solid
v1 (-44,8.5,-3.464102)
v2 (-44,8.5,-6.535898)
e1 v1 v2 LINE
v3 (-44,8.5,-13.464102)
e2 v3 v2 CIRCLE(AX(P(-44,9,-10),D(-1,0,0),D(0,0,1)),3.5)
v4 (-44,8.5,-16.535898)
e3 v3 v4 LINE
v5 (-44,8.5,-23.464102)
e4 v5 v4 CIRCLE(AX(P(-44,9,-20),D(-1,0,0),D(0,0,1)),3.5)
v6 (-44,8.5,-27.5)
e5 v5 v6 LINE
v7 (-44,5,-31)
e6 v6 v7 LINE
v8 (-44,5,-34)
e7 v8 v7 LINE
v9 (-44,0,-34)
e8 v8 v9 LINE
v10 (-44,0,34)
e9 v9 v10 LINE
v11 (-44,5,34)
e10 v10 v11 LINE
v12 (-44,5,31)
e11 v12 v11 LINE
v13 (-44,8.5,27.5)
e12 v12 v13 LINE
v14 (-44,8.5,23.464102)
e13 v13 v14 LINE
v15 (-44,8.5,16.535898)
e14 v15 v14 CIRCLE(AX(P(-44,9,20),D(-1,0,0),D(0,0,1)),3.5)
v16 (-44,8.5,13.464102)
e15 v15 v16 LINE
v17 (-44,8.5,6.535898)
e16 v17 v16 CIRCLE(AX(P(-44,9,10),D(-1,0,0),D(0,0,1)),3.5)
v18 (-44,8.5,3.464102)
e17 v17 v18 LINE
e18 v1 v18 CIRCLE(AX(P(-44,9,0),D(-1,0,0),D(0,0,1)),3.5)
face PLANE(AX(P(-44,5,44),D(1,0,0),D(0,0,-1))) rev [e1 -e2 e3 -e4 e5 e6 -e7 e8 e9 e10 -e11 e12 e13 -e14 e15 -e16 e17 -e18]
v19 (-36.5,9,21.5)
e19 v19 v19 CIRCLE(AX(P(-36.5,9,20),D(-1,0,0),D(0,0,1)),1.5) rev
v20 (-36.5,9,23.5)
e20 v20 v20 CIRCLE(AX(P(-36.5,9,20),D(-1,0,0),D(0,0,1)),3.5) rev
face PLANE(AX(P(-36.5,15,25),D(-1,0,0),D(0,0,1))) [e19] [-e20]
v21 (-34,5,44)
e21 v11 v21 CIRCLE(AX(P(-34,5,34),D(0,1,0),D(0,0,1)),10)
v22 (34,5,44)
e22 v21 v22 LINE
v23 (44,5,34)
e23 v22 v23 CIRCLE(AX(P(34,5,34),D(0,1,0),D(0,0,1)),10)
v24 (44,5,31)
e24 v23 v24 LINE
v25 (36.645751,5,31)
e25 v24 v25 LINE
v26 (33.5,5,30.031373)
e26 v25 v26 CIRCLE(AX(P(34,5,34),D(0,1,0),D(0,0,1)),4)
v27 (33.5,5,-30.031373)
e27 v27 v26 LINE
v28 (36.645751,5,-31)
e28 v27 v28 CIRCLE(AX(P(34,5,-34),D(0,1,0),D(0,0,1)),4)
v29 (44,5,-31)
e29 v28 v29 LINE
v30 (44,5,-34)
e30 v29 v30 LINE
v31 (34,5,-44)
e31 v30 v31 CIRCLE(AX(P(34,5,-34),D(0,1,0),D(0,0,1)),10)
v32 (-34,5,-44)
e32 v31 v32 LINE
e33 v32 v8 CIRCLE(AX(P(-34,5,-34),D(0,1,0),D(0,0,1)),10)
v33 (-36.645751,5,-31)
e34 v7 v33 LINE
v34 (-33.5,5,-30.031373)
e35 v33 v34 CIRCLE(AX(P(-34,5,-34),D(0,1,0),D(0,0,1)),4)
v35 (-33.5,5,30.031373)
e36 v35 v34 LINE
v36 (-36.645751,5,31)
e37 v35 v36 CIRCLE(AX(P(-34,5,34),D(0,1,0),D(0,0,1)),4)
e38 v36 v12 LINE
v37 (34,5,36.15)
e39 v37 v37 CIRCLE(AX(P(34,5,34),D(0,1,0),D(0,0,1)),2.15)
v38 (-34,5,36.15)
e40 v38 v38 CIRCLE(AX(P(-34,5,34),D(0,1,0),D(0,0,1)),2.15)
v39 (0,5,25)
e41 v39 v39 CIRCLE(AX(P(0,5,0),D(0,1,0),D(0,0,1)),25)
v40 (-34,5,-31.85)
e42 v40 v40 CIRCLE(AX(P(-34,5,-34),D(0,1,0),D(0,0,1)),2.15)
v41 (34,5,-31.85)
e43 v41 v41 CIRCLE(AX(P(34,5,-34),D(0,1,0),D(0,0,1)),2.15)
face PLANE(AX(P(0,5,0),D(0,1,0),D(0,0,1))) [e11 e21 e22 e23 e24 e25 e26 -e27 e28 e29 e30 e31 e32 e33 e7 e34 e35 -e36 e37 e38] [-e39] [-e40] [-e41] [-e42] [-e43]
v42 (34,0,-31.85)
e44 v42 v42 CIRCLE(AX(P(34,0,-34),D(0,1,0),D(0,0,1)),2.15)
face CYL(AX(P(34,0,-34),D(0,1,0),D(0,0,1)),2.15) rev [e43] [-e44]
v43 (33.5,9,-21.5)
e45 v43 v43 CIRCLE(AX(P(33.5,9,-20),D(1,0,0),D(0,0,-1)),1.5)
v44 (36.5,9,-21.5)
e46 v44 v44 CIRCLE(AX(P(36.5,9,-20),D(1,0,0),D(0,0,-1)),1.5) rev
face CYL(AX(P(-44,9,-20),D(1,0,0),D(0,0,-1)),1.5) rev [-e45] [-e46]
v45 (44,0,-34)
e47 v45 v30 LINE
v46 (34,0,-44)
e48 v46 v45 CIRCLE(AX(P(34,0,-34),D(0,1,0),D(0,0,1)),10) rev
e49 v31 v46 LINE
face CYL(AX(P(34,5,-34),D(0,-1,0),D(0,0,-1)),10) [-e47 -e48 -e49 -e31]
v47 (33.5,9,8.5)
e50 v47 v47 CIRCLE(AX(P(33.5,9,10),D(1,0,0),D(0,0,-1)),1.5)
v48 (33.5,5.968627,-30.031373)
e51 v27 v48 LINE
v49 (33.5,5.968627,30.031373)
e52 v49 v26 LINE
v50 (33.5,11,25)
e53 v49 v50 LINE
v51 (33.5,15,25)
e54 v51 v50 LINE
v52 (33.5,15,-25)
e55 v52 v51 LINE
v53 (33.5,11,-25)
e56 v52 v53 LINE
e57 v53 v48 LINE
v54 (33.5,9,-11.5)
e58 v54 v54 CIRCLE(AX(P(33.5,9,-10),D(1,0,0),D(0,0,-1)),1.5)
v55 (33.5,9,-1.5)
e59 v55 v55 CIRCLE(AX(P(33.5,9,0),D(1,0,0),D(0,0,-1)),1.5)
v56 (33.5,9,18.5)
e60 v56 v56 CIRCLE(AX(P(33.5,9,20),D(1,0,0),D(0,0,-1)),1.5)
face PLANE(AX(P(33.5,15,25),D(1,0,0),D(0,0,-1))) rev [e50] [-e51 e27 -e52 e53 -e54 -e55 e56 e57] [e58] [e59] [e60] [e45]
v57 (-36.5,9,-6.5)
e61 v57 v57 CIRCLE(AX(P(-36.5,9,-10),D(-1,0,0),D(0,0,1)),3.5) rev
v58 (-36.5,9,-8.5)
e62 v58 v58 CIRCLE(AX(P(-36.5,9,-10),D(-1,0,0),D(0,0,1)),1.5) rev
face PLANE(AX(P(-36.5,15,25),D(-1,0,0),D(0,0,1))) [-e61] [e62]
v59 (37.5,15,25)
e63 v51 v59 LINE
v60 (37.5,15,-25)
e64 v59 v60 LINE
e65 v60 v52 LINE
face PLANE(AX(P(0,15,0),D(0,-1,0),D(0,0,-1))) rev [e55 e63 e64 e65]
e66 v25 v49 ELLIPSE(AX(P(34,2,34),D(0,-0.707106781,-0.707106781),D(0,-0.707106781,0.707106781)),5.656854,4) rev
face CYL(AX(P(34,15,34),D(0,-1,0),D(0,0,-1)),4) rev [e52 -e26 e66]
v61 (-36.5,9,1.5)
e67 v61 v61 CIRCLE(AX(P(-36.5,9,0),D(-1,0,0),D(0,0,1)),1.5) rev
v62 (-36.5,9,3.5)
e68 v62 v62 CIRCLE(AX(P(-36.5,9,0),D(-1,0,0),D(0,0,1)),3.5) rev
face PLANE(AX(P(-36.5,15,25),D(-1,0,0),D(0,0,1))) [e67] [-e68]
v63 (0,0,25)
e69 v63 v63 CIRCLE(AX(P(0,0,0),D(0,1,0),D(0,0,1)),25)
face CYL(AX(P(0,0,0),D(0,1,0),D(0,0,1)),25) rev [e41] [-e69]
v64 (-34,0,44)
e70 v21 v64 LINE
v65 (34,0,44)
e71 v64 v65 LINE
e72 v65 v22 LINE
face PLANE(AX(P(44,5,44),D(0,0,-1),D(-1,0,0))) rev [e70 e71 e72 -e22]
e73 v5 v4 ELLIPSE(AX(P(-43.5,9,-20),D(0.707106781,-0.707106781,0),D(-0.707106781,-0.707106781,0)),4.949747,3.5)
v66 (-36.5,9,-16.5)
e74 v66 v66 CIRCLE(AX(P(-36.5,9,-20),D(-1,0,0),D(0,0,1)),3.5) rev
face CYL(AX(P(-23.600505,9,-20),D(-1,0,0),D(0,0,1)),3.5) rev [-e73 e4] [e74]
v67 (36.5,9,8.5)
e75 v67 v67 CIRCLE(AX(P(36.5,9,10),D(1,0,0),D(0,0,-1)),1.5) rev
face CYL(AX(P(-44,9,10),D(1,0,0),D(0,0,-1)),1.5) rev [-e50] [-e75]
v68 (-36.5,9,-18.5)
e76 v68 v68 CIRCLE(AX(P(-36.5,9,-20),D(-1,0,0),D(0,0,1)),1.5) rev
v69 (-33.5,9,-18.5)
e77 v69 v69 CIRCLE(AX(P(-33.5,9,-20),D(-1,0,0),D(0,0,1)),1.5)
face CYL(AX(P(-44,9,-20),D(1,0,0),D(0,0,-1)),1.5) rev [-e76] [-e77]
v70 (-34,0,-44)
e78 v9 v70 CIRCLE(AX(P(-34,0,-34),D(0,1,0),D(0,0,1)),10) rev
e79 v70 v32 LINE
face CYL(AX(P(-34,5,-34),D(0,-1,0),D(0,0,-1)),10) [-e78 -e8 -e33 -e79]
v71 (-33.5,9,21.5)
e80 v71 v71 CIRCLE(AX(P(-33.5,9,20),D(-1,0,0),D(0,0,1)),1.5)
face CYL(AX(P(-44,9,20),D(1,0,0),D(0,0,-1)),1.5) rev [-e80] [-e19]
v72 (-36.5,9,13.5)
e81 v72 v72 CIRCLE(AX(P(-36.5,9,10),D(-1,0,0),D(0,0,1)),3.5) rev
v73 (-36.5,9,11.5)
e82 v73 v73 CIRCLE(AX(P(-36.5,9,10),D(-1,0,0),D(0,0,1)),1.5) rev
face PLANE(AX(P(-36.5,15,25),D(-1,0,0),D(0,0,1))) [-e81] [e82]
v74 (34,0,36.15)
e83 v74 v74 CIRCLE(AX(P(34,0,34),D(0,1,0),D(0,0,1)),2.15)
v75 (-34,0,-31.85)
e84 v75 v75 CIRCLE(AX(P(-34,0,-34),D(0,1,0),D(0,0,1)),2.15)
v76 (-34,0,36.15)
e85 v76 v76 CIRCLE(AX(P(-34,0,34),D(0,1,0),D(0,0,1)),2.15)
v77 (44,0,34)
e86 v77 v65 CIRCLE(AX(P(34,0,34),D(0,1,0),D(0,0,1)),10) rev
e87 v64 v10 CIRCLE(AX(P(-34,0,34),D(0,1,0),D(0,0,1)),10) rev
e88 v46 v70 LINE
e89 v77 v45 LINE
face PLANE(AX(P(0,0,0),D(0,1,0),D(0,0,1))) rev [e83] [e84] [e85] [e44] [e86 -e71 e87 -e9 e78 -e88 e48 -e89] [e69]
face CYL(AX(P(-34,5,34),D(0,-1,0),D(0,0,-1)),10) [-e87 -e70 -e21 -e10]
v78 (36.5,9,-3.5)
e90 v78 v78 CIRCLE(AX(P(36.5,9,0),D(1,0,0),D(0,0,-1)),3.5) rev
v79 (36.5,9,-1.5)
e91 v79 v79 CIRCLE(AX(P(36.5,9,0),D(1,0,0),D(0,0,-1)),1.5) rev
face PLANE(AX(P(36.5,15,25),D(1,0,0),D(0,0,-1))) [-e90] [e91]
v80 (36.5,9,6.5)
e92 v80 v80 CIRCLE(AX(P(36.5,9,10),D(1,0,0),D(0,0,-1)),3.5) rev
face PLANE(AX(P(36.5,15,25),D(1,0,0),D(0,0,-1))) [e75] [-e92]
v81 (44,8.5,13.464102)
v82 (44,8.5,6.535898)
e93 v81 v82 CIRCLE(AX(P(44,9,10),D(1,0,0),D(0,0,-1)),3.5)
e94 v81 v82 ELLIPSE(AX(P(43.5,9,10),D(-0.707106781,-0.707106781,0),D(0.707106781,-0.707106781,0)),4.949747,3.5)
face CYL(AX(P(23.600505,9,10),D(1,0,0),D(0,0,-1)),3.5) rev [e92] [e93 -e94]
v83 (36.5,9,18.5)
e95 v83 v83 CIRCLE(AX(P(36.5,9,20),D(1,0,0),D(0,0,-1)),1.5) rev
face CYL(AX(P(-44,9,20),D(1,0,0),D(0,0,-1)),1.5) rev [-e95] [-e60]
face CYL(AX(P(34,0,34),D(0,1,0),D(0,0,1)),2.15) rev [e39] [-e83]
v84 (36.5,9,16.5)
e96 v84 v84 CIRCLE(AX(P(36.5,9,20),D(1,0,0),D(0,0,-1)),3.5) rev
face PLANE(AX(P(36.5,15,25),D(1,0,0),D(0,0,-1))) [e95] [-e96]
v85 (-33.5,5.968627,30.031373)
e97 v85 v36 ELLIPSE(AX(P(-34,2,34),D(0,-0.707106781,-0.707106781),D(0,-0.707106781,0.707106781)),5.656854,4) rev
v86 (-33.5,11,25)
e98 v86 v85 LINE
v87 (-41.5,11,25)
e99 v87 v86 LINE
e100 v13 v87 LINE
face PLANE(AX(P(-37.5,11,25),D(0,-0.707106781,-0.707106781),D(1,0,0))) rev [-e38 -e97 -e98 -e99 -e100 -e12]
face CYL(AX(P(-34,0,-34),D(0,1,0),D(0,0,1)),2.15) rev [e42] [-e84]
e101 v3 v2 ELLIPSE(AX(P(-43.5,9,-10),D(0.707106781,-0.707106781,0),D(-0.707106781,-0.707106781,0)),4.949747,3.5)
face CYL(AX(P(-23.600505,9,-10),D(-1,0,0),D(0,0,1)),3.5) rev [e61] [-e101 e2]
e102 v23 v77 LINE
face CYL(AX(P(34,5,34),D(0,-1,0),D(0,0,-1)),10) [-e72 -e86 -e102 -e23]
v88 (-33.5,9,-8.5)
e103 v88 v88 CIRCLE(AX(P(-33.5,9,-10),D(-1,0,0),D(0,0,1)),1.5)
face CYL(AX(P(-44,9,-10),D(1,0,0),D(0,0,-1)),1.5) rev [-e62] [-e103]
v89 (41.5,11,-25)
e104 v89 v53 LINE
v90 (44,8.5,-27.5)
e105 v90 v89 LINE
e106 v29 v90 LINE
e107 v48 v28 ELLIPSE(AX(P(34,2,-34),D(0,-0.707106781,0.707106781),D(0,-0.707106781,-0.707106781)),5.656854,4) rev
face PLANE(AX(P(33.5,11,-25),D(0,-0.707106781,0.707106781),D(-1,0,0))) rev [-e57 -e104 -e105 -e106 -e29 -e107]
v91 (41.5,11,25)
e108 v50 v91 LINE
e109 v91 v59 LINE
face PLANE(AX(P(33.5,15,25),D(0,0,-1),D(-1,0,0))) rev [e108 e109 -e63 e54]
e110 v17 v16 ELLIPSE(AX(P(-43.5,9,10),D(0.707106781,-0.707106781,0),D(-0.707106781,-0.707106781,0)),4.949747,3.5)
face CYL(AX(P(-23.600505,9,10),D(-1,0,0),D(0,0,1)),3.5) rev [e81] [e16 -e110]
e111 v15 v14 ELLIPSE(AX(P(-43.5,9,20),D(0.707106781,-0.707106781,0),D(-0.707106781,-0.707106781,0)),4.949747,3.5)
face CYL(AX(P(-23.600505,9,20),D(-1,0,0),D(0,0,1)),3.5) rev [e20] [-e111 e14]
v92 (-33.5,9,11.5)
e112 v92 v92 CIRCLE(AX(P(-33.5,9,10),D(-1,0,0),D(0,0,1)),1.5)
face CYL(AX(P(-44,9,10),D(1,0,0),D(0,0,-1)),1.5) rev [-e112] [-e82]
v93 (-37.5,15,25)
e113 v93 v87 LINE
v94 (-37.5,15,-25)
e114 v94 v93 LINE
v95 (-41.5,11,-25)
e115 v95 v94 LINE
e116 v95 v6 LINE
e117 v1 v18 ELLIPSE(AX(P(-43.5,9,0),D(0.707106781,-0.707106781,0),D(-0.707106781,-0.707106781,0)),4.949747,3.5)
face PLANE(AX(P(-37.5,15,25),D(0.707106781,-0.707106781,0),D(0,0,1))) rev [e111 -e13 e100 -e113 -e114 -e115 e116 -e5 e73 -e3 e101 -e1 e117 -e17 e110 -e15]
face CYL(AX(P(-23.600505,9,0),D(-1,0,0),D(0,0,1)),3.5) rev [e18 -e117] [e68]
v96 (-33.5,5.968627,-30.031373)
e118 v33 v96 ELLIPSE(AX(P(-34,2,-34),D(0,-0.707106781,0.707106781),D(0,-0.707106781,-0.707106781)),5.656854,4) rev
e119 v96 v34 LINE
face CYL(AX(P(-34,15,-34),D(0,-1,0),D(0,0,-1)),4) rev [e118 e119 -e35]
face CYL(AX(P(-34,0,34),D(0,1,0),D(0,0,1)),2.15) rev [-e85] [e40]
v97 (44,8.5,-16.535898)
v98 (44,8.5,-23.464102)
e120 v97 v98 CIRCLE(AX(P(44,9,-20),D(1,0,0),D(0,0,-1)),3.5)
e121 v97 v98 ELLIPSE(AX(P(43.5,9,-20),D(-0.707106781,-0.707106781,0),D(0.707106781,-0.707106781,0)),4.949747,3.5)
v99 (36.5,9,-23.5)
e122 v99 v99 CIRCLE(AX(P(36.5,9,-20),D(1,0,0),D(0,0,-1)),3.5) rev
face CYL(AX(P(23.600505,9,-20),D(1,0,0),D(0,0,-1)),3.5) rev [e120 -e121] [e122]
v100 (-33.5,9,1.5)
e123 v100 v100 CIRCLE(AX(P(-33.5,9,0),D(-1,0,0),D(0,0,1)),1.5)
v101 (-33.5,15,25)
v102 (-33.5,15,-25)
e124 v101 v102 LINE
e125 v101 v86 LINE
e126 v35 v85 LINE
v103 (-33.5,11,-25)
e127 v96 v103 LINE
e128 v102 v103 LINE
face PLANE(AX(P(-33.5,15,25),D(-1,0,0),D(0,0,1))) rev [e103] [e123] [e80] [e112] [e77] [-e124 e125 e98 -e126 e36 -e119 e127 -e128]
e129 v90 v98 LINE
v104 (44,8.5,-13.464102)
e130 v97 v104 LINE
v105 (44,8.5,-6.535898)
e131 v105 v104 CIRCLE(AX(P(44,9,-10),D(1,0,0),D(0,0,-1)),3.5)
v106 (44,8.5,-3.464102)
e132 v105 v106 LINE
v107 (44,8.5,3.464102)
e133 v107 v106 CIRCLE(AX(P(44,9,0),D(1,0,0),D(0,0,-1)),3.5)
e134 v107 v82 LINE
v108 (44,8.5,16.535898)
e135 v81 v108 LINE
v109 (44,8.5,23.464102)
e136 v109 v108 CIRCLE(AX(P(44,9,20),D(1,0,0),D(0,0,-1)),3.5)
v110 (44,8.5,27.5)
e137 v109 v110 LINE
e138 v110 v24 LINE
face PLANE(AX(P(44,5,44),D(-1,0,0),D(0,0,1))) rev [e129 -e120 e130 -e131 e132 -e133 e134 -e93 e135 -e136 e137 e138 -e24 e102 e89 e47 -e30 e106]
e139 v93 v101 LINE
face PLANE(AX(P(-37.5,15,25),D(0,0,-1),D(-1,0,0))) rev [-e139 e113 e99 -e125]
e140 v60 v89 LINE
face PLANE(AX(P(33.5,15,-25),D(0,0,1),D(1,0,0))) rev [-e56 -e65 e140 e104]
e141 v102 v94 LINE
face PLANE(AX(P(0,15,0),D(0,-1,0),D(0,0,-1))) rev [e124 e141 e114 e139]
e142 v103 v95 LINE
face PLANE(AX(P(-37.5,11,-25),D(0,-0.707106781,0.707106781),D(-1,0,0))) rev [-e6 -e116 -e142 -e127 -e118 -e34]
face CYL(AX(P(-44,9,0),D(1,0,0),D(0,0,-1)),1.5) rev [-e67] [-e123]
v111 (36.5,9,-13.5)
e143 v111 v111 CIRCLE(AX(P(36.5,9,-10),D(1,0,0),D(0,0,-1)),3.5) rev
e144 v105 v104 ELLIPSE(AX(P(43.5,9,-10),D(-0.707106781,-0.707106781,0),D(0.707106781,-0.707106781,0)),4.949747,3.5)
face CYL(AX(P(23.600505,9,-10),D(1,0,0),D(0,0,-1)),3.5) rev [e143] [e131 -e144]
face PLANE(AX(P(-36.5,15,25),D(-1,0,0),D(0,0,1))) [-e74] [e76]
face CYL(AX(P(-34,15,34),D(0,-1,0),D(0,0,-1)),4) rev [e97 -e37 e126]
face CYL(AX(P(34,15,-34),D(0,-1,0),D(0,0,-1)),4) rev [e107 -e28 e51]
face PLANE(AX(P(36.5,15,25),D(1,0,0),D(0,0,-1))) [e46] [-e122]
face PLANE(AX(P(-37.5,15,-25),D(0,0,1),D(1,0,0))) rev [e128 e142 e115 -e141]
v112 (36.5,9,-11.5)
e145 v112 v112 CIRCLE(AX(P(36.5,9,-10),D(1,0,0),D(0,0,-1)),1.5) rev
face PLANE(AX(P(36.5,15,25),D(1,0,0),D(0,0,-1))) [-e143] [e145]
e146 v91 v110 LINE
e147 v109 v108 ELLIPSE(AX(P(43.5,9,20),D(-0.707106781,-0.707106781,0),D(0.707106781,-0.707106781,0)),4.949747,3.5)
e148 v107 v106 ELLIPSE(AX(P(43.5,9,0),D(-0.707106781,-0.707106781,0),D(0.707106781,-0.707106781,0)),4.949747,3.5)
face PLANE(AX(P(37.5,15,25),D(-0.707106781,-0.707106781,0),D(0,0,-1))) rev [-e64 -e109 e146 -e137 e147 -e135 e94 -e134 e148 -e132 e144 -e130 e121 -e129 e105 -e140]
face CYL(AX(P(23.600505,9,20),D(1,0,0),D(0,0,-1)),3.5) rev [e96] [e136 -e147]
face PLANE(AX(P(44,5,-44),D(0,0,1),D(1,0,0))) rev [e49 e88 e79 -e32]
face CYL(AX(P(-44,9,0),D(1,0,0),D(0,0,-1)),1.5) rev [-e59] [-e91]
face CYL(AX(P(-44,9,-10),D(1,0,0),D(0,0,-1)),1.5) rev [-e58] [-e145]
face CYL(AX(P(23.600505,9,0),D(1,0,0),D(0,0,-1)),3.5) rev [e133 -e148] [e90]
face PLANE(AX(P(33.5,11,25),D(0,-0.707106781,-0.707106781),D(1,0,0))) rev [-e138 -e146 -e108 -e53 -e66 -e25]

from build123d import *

# Parameters (mm, degrees)
SKETCH1_W           = 88
SKETCH1_H           = 88
BOSS_EXTRUDE1_DEPTH = 5
FILLET1_R           = 10
SKETCH2_R           = 2.15
CUT_EXTRUDE1_DEPTH  = 63.42595614
SKETCH3_W           = 4
SKETCH3_H           = 50
BOSS_EXTRUDE2_DEPTH = 10
CHAMFER1_SIZE       = 10
SKETCH4_R           = 1.5
CUT_EXTRUDE2_DEPTH  = 65.007812023
SKETCH5_R           = 3.5
CUT_EXTRUDE3_DEPTH  = 7.5
CUT_EXTRUDE4_START  = -7.5
SKETCH6_R           = 3.5
CUT_EXTRUDE4_DEPTH  = 7.5
LPATTERN2_COUNT     = 5
LPATTERN2_PITCH     = 10
CHAMFER2_SIZE       = 6
SKETCH7_R           = 25
CUT_EXTRUDE5_DEPTH  = 64.023805026
SKETCH8_R           = 4
CUT_EXTRUDE6_DEPTH  = 64.023805026


with BuildPart() as part:
    # Sketch1 → Boss-Extrude1 (new body)
    with BuildSketch(Plane(origin=(0, 0, 0), x_dir=(1, 0, 0), z_dir=(0, 1, 0))):
        Rectangle(SKETCH1_W, SKETCH1_H)
    extrude(amount=BOSS_EXTRUDE1_DEPTH)

    # Fillet1
    fillet1_edges = [part.edges().sort_by_distance(p)[0] for p in [
        (-44, 2.5, -44),
        (44, 2.5, -44),
        (44, 2.5, 44),
        (-44, 2.5, 44),
    ]]
    fillet(fillet1_edges, radius=FILLET1_R)

    # Sketch2 → Cut-Extrude1 (cut, through all)
    with BuildSketch(Plane(origin=(0, 5, 0), x_dir=(1, 0, 0), z_dir=(0, 1, 0))):
        with Locations(Location((34, 34, 0), (0, 0, 270))):
            Circle(SKETCH2_R)
        with Locations(Location((34, -34, 0), (0, 0, 270))):
            Circle(SKETCH2_R)
        with Locations(Location((-34, -34, 0), (0, 0, 270))):
            Circle(SKETCH2_R)
        with Locations(Location((-34, 34, 0), (0, 0, 270))):
            Circle(SKETCH2_R)
    extrude(amount=-CUT_EXTRUDE1_DEPTH, mode=Mode.SUBTRACT)

    # Sketch3 → Boss-Extrude2 (add)
    with BuildSketch(Plane(origin=(0, 5, 0), x_dir=(1, 0, 0), z_dir=(0, 1, 0))):
        with Locations((-35.5, 0)):
            Rectangle(SKETCH3_W, SKETCH3_H)
        with Locations((35.5, 0)):
            Rectangle(SKETCH3_W, SKETCH3_H)
    extrude(amount=BOSS_EXTRUDE2_DEPTH)

    # Chamfer1
    # the kernel refuses this chamfer: 10 mm, written as the material it adds along each edge
    with BuildSketch(Plane(origin=(37.5, 5, 25), x_dir=(0.9996219169112968, -0.027495876610586403, 0), z_dir=(0, 0, -1))) as chamfer1_piece_1_section:
        Polygon((CHAMFER1_SIZE * 0.999621916911, -CHAMFER1_SIZE * 0.0274958766106), (-CHAMFER1_SIZE * 0.0274958766106, -CHAMFER1_SIZE * 0.999621916911), (0, 0), align=None)
    chamfer1_piece_1 = extrude(amount=50, mode=Mode.PRIVATE)
    chamfer1_piece_1 = split(chamfer1_piece_1, bisect_by=Plane(origin=(44, 8.634022107, 0), z_dir=(-1, 0, 0)), keep=Keep.TOP, mode=Mode.PRIVATE)
    add(chamfer1_piece_1)
    with BuildSketch(Plane(origin=(-37.5, 5, -25), x_dir=(-0.9996219169112968, -0.027495876610586403, 0), z_dir=(0, 0, 1))) as chamfer1_piece_2_section:
        Polygon((CHAMFER1_SIZE * 0.999621916911, -CHAMFER1_SIZE * 0.0274958766106), (-CHAMFER1_SIZE * 0.0274958766106, -CHAMFER1_SIZE * 0.999621916911), (0, 0), align=None)
    chamfer1_piece_2 = extrude(amount=50, mode=Mode.PRIVATE)
    chamfer1_piece_2 = split(chamfer1_piece_2, bisect_by=Plane(origin=(-44, 8.634022107, 0), z_dir=(1, 0, 0)), keep=Keep.TOP, mode=Mode.PRIVATE)
    add(chamfer1_piece_2)

    # Sketch4 → Cut-Extrude2 (cut, symmetric)
    with BuildSketch(Plane(origin=(0, 0, 0), x_dir=(0, 0, -1), z_dir=(1, 0, 0))):
        with Locations(Location((-20, 9, 0), (0, 0, 340.528779366))):
            Circle(SKETCH4_R)
    cut_extrude2 = extrude(amount=CUT_EXTRUDE2_DEPTH, both=True, mode=Mode.SUBTRACT)

    # Sketch5 → Cut-Extrude3 (cut)
    with BuildSketch(Plane(origin=(44, 0, 0), x_dir=(0, 0, -1), z_dir=(1, 0, 0))):
        with Locations((-20, 9)):
            Circle(SKETCH5_R)
    cut_extrude3 = extrude(amount=-CUT_EXTRUDE3_DEPTH, mode=Mode.SUBTRACT)

    # Sketch6 → Cut-Extrude4 (cut)
    with BuildSketch(Plane.ZY.offset(44).offset(CUT_EXTRUDE4_START)):
        with Locations(Location((20, 9, 0), (0, 0, 180))):
            Circle(SKETCH6_R)
    cut_extrude4 = extrude(amount=CUT_EXTRUDE4_DEPTH, mode=Mode.SUBTRACT)

    # LPattern2: Cut-Extrude2, Cut-Extrude3, Cut-Extrude4 ×5
    with Locations(*[(0, 0, -i * LPATTERN2_PITCH) for i in range(1, LPATTERN2_COUNT)]):
        add(cut_extrude2, mode=Mode.SUBTRACT)
        add(cut_extrude3, mode=Mode.SUBTRACT)
        add(cut_extrude4, mode=Mode.SUBTRACT)

    # Chamfer2
    # the kernel refuses this chamfer: 6 mm, written as the material it adds along each edge
    with BuildSketch(Plane(origin=(-44, 5, 25), x_dir=(-2.4740283856501726e-13, 0.9996219169112965, -0.027495876610592693), z_dir=(1, 0, 0))) as chamfer2_piece_1_section:
        Polygon((CHAMFER2_SIZE * 0.999621916911, CHAMFER2_SIZE * 0.0274958766106), (-CHAMFER2_SIZE * 0.0274958766102, CHAMFER2_SIZE * 0.999621916911), (0, 0), align=None)
    chamfer2_piece_1 = extrude(amount=10.5, mode=Mode.PRIVATE)
    chamfer2_piece_1 = split(chamfer2_piece_1, bisect_by=Plane(origin=(-42.122041118, 10.377958882, 27.00389647), z_dir=(0.7071067811868302, -0.7071067811862648, 0)), keep=Keep.TOP, mode=Mode.PRIVATE)
    add(chamfer2_piece_1)
    with BuildSketch(Plane(origin=(-33.5, 5, -25), x_dir=(-2.474214452272925e-13, 0.9996219169112968, 0.027495876610585616), z_dir=(-1, 0, 0))) as chamfer2_piece_2_section:
        Polygon((CHAMFER2_SIZE * 0.999621916911, CHAMFER2_SIZE * 0.0274958766106), (-CHAMFER2_SIZE * 0.0274958766106, CHAMFER2_SIZE * 0.999621916911), (0, 0), align=None)
    chamfer2_piece_2 = extrude(amount=10.5, mode=Mode.PRIVATE)
    chamfer2_piece_2 = split(chamfer2_piece_2, bisect_by=Plane(origin=(-42.122041118, 10.377958882, -27.00389647), z_dir=(0.7071067811868302, -0.7071067811862648, 0)), keep=Keep.TOP, mode=Mode.PRIVATE)
    add(chamfer2_piece_2)
    with BuildSketch(Plane(origin=(44, 5, -25), x_dir=(5.708966314845366e-15, -0.027495876610159536, -0.9996219169113084), z_dir=(-1, 0, 0))) as chamfer2_piece_3_section:
        Polygon((CHAMFER2_SIZE * 0.999621916911, -CHAMFER2_SIZE * 0.0274958766106), (-CHAMFER2_SIZE * 0.0274958766102, -CHAMFER2_SIZE * 0.999621916911), (0, 0), align=None)
    chamfer2_piece_3 = extrude(amount=10.5, mode=Mode.PRIVATE)
    chamfer2_piece_3 = split(chamfer2_piece_3, bisect_by=Plane(origin=(42.122041118, 10.377958882, -27.00389647), z_dir=(-0.7071067811868302, -0.7071067811862648, 0)), keep=Keep.TOP, mode=Mode.PRIVATE)
    add(chamfer2_piece_3)
    with BuildSketch(Plane(origin=(33.5, 5, 25), x_dir=(-1.864328825330305e-14, -0.02749587661058664, 0.9996219169112968), z_dir=(1, 0, 0))) as chamfer2_piece_4_section:
        Polygon((CHAMFER2_SIZE * 0.999621916911, -CHAMFER2_SIZE * 0.0274958766106), (-CHAMFER2_SIZE * 0.0274958766106, -CHAMFER2_SIZE * 0.999621916911), (0, 0), align=None)
    chamfer2_piece_4 = extrude(amount=10.5, mode=Mode.PRIVATE)
    chamfer2_piece_4 = split(chamfer2_piece_4, bisect_by=Plane(origin=(42.122041118, 10.377958882, 27.00389647), z_dir=(-0.7071067811868302, -0.7071067811862648, 0)), keep=Keep.TOP, mode=Mode.PRIVATE)
    add(chamfer2_piece_4)

    # Sketch7 → Cut-Extrude5 (cut, through all)
    with BuildSketch(Plane(origin=(0, 5, 0), x_dir=(1, 0, 0), z_dir=(0, 1, 0))):
        with Locations(Location((0, 0, 0), (0, 0, 270))):
            Circle(SKETCH7_R)
    extrude(amount=-CUT_EXTRUDE5_DEPTH, mode=Mode.SUBTRACT)

    # Sketch8 → Cut-Extrude6 (cut, through all)
    with BuildSketch(Plane(origin=(0, 5, 0), x_dir=(1, 0, 0), z_dir=(0, 1, 0))):
        with Locations((-34, -34)):
            Circle(SKETCH8_R)
        with Locations((34, -34)):
            Circle(SKETCH8_R)
        with Locations((34, 34)):
            Circle(SKETCH8_R)
        with Locations((-34, 34)):
            Circle(SKETCH8_R)
    extrude(amount=CUT_EXTRUDE6_DEPTH, mode=Mode.SUBTRACT)


solid = part.part
